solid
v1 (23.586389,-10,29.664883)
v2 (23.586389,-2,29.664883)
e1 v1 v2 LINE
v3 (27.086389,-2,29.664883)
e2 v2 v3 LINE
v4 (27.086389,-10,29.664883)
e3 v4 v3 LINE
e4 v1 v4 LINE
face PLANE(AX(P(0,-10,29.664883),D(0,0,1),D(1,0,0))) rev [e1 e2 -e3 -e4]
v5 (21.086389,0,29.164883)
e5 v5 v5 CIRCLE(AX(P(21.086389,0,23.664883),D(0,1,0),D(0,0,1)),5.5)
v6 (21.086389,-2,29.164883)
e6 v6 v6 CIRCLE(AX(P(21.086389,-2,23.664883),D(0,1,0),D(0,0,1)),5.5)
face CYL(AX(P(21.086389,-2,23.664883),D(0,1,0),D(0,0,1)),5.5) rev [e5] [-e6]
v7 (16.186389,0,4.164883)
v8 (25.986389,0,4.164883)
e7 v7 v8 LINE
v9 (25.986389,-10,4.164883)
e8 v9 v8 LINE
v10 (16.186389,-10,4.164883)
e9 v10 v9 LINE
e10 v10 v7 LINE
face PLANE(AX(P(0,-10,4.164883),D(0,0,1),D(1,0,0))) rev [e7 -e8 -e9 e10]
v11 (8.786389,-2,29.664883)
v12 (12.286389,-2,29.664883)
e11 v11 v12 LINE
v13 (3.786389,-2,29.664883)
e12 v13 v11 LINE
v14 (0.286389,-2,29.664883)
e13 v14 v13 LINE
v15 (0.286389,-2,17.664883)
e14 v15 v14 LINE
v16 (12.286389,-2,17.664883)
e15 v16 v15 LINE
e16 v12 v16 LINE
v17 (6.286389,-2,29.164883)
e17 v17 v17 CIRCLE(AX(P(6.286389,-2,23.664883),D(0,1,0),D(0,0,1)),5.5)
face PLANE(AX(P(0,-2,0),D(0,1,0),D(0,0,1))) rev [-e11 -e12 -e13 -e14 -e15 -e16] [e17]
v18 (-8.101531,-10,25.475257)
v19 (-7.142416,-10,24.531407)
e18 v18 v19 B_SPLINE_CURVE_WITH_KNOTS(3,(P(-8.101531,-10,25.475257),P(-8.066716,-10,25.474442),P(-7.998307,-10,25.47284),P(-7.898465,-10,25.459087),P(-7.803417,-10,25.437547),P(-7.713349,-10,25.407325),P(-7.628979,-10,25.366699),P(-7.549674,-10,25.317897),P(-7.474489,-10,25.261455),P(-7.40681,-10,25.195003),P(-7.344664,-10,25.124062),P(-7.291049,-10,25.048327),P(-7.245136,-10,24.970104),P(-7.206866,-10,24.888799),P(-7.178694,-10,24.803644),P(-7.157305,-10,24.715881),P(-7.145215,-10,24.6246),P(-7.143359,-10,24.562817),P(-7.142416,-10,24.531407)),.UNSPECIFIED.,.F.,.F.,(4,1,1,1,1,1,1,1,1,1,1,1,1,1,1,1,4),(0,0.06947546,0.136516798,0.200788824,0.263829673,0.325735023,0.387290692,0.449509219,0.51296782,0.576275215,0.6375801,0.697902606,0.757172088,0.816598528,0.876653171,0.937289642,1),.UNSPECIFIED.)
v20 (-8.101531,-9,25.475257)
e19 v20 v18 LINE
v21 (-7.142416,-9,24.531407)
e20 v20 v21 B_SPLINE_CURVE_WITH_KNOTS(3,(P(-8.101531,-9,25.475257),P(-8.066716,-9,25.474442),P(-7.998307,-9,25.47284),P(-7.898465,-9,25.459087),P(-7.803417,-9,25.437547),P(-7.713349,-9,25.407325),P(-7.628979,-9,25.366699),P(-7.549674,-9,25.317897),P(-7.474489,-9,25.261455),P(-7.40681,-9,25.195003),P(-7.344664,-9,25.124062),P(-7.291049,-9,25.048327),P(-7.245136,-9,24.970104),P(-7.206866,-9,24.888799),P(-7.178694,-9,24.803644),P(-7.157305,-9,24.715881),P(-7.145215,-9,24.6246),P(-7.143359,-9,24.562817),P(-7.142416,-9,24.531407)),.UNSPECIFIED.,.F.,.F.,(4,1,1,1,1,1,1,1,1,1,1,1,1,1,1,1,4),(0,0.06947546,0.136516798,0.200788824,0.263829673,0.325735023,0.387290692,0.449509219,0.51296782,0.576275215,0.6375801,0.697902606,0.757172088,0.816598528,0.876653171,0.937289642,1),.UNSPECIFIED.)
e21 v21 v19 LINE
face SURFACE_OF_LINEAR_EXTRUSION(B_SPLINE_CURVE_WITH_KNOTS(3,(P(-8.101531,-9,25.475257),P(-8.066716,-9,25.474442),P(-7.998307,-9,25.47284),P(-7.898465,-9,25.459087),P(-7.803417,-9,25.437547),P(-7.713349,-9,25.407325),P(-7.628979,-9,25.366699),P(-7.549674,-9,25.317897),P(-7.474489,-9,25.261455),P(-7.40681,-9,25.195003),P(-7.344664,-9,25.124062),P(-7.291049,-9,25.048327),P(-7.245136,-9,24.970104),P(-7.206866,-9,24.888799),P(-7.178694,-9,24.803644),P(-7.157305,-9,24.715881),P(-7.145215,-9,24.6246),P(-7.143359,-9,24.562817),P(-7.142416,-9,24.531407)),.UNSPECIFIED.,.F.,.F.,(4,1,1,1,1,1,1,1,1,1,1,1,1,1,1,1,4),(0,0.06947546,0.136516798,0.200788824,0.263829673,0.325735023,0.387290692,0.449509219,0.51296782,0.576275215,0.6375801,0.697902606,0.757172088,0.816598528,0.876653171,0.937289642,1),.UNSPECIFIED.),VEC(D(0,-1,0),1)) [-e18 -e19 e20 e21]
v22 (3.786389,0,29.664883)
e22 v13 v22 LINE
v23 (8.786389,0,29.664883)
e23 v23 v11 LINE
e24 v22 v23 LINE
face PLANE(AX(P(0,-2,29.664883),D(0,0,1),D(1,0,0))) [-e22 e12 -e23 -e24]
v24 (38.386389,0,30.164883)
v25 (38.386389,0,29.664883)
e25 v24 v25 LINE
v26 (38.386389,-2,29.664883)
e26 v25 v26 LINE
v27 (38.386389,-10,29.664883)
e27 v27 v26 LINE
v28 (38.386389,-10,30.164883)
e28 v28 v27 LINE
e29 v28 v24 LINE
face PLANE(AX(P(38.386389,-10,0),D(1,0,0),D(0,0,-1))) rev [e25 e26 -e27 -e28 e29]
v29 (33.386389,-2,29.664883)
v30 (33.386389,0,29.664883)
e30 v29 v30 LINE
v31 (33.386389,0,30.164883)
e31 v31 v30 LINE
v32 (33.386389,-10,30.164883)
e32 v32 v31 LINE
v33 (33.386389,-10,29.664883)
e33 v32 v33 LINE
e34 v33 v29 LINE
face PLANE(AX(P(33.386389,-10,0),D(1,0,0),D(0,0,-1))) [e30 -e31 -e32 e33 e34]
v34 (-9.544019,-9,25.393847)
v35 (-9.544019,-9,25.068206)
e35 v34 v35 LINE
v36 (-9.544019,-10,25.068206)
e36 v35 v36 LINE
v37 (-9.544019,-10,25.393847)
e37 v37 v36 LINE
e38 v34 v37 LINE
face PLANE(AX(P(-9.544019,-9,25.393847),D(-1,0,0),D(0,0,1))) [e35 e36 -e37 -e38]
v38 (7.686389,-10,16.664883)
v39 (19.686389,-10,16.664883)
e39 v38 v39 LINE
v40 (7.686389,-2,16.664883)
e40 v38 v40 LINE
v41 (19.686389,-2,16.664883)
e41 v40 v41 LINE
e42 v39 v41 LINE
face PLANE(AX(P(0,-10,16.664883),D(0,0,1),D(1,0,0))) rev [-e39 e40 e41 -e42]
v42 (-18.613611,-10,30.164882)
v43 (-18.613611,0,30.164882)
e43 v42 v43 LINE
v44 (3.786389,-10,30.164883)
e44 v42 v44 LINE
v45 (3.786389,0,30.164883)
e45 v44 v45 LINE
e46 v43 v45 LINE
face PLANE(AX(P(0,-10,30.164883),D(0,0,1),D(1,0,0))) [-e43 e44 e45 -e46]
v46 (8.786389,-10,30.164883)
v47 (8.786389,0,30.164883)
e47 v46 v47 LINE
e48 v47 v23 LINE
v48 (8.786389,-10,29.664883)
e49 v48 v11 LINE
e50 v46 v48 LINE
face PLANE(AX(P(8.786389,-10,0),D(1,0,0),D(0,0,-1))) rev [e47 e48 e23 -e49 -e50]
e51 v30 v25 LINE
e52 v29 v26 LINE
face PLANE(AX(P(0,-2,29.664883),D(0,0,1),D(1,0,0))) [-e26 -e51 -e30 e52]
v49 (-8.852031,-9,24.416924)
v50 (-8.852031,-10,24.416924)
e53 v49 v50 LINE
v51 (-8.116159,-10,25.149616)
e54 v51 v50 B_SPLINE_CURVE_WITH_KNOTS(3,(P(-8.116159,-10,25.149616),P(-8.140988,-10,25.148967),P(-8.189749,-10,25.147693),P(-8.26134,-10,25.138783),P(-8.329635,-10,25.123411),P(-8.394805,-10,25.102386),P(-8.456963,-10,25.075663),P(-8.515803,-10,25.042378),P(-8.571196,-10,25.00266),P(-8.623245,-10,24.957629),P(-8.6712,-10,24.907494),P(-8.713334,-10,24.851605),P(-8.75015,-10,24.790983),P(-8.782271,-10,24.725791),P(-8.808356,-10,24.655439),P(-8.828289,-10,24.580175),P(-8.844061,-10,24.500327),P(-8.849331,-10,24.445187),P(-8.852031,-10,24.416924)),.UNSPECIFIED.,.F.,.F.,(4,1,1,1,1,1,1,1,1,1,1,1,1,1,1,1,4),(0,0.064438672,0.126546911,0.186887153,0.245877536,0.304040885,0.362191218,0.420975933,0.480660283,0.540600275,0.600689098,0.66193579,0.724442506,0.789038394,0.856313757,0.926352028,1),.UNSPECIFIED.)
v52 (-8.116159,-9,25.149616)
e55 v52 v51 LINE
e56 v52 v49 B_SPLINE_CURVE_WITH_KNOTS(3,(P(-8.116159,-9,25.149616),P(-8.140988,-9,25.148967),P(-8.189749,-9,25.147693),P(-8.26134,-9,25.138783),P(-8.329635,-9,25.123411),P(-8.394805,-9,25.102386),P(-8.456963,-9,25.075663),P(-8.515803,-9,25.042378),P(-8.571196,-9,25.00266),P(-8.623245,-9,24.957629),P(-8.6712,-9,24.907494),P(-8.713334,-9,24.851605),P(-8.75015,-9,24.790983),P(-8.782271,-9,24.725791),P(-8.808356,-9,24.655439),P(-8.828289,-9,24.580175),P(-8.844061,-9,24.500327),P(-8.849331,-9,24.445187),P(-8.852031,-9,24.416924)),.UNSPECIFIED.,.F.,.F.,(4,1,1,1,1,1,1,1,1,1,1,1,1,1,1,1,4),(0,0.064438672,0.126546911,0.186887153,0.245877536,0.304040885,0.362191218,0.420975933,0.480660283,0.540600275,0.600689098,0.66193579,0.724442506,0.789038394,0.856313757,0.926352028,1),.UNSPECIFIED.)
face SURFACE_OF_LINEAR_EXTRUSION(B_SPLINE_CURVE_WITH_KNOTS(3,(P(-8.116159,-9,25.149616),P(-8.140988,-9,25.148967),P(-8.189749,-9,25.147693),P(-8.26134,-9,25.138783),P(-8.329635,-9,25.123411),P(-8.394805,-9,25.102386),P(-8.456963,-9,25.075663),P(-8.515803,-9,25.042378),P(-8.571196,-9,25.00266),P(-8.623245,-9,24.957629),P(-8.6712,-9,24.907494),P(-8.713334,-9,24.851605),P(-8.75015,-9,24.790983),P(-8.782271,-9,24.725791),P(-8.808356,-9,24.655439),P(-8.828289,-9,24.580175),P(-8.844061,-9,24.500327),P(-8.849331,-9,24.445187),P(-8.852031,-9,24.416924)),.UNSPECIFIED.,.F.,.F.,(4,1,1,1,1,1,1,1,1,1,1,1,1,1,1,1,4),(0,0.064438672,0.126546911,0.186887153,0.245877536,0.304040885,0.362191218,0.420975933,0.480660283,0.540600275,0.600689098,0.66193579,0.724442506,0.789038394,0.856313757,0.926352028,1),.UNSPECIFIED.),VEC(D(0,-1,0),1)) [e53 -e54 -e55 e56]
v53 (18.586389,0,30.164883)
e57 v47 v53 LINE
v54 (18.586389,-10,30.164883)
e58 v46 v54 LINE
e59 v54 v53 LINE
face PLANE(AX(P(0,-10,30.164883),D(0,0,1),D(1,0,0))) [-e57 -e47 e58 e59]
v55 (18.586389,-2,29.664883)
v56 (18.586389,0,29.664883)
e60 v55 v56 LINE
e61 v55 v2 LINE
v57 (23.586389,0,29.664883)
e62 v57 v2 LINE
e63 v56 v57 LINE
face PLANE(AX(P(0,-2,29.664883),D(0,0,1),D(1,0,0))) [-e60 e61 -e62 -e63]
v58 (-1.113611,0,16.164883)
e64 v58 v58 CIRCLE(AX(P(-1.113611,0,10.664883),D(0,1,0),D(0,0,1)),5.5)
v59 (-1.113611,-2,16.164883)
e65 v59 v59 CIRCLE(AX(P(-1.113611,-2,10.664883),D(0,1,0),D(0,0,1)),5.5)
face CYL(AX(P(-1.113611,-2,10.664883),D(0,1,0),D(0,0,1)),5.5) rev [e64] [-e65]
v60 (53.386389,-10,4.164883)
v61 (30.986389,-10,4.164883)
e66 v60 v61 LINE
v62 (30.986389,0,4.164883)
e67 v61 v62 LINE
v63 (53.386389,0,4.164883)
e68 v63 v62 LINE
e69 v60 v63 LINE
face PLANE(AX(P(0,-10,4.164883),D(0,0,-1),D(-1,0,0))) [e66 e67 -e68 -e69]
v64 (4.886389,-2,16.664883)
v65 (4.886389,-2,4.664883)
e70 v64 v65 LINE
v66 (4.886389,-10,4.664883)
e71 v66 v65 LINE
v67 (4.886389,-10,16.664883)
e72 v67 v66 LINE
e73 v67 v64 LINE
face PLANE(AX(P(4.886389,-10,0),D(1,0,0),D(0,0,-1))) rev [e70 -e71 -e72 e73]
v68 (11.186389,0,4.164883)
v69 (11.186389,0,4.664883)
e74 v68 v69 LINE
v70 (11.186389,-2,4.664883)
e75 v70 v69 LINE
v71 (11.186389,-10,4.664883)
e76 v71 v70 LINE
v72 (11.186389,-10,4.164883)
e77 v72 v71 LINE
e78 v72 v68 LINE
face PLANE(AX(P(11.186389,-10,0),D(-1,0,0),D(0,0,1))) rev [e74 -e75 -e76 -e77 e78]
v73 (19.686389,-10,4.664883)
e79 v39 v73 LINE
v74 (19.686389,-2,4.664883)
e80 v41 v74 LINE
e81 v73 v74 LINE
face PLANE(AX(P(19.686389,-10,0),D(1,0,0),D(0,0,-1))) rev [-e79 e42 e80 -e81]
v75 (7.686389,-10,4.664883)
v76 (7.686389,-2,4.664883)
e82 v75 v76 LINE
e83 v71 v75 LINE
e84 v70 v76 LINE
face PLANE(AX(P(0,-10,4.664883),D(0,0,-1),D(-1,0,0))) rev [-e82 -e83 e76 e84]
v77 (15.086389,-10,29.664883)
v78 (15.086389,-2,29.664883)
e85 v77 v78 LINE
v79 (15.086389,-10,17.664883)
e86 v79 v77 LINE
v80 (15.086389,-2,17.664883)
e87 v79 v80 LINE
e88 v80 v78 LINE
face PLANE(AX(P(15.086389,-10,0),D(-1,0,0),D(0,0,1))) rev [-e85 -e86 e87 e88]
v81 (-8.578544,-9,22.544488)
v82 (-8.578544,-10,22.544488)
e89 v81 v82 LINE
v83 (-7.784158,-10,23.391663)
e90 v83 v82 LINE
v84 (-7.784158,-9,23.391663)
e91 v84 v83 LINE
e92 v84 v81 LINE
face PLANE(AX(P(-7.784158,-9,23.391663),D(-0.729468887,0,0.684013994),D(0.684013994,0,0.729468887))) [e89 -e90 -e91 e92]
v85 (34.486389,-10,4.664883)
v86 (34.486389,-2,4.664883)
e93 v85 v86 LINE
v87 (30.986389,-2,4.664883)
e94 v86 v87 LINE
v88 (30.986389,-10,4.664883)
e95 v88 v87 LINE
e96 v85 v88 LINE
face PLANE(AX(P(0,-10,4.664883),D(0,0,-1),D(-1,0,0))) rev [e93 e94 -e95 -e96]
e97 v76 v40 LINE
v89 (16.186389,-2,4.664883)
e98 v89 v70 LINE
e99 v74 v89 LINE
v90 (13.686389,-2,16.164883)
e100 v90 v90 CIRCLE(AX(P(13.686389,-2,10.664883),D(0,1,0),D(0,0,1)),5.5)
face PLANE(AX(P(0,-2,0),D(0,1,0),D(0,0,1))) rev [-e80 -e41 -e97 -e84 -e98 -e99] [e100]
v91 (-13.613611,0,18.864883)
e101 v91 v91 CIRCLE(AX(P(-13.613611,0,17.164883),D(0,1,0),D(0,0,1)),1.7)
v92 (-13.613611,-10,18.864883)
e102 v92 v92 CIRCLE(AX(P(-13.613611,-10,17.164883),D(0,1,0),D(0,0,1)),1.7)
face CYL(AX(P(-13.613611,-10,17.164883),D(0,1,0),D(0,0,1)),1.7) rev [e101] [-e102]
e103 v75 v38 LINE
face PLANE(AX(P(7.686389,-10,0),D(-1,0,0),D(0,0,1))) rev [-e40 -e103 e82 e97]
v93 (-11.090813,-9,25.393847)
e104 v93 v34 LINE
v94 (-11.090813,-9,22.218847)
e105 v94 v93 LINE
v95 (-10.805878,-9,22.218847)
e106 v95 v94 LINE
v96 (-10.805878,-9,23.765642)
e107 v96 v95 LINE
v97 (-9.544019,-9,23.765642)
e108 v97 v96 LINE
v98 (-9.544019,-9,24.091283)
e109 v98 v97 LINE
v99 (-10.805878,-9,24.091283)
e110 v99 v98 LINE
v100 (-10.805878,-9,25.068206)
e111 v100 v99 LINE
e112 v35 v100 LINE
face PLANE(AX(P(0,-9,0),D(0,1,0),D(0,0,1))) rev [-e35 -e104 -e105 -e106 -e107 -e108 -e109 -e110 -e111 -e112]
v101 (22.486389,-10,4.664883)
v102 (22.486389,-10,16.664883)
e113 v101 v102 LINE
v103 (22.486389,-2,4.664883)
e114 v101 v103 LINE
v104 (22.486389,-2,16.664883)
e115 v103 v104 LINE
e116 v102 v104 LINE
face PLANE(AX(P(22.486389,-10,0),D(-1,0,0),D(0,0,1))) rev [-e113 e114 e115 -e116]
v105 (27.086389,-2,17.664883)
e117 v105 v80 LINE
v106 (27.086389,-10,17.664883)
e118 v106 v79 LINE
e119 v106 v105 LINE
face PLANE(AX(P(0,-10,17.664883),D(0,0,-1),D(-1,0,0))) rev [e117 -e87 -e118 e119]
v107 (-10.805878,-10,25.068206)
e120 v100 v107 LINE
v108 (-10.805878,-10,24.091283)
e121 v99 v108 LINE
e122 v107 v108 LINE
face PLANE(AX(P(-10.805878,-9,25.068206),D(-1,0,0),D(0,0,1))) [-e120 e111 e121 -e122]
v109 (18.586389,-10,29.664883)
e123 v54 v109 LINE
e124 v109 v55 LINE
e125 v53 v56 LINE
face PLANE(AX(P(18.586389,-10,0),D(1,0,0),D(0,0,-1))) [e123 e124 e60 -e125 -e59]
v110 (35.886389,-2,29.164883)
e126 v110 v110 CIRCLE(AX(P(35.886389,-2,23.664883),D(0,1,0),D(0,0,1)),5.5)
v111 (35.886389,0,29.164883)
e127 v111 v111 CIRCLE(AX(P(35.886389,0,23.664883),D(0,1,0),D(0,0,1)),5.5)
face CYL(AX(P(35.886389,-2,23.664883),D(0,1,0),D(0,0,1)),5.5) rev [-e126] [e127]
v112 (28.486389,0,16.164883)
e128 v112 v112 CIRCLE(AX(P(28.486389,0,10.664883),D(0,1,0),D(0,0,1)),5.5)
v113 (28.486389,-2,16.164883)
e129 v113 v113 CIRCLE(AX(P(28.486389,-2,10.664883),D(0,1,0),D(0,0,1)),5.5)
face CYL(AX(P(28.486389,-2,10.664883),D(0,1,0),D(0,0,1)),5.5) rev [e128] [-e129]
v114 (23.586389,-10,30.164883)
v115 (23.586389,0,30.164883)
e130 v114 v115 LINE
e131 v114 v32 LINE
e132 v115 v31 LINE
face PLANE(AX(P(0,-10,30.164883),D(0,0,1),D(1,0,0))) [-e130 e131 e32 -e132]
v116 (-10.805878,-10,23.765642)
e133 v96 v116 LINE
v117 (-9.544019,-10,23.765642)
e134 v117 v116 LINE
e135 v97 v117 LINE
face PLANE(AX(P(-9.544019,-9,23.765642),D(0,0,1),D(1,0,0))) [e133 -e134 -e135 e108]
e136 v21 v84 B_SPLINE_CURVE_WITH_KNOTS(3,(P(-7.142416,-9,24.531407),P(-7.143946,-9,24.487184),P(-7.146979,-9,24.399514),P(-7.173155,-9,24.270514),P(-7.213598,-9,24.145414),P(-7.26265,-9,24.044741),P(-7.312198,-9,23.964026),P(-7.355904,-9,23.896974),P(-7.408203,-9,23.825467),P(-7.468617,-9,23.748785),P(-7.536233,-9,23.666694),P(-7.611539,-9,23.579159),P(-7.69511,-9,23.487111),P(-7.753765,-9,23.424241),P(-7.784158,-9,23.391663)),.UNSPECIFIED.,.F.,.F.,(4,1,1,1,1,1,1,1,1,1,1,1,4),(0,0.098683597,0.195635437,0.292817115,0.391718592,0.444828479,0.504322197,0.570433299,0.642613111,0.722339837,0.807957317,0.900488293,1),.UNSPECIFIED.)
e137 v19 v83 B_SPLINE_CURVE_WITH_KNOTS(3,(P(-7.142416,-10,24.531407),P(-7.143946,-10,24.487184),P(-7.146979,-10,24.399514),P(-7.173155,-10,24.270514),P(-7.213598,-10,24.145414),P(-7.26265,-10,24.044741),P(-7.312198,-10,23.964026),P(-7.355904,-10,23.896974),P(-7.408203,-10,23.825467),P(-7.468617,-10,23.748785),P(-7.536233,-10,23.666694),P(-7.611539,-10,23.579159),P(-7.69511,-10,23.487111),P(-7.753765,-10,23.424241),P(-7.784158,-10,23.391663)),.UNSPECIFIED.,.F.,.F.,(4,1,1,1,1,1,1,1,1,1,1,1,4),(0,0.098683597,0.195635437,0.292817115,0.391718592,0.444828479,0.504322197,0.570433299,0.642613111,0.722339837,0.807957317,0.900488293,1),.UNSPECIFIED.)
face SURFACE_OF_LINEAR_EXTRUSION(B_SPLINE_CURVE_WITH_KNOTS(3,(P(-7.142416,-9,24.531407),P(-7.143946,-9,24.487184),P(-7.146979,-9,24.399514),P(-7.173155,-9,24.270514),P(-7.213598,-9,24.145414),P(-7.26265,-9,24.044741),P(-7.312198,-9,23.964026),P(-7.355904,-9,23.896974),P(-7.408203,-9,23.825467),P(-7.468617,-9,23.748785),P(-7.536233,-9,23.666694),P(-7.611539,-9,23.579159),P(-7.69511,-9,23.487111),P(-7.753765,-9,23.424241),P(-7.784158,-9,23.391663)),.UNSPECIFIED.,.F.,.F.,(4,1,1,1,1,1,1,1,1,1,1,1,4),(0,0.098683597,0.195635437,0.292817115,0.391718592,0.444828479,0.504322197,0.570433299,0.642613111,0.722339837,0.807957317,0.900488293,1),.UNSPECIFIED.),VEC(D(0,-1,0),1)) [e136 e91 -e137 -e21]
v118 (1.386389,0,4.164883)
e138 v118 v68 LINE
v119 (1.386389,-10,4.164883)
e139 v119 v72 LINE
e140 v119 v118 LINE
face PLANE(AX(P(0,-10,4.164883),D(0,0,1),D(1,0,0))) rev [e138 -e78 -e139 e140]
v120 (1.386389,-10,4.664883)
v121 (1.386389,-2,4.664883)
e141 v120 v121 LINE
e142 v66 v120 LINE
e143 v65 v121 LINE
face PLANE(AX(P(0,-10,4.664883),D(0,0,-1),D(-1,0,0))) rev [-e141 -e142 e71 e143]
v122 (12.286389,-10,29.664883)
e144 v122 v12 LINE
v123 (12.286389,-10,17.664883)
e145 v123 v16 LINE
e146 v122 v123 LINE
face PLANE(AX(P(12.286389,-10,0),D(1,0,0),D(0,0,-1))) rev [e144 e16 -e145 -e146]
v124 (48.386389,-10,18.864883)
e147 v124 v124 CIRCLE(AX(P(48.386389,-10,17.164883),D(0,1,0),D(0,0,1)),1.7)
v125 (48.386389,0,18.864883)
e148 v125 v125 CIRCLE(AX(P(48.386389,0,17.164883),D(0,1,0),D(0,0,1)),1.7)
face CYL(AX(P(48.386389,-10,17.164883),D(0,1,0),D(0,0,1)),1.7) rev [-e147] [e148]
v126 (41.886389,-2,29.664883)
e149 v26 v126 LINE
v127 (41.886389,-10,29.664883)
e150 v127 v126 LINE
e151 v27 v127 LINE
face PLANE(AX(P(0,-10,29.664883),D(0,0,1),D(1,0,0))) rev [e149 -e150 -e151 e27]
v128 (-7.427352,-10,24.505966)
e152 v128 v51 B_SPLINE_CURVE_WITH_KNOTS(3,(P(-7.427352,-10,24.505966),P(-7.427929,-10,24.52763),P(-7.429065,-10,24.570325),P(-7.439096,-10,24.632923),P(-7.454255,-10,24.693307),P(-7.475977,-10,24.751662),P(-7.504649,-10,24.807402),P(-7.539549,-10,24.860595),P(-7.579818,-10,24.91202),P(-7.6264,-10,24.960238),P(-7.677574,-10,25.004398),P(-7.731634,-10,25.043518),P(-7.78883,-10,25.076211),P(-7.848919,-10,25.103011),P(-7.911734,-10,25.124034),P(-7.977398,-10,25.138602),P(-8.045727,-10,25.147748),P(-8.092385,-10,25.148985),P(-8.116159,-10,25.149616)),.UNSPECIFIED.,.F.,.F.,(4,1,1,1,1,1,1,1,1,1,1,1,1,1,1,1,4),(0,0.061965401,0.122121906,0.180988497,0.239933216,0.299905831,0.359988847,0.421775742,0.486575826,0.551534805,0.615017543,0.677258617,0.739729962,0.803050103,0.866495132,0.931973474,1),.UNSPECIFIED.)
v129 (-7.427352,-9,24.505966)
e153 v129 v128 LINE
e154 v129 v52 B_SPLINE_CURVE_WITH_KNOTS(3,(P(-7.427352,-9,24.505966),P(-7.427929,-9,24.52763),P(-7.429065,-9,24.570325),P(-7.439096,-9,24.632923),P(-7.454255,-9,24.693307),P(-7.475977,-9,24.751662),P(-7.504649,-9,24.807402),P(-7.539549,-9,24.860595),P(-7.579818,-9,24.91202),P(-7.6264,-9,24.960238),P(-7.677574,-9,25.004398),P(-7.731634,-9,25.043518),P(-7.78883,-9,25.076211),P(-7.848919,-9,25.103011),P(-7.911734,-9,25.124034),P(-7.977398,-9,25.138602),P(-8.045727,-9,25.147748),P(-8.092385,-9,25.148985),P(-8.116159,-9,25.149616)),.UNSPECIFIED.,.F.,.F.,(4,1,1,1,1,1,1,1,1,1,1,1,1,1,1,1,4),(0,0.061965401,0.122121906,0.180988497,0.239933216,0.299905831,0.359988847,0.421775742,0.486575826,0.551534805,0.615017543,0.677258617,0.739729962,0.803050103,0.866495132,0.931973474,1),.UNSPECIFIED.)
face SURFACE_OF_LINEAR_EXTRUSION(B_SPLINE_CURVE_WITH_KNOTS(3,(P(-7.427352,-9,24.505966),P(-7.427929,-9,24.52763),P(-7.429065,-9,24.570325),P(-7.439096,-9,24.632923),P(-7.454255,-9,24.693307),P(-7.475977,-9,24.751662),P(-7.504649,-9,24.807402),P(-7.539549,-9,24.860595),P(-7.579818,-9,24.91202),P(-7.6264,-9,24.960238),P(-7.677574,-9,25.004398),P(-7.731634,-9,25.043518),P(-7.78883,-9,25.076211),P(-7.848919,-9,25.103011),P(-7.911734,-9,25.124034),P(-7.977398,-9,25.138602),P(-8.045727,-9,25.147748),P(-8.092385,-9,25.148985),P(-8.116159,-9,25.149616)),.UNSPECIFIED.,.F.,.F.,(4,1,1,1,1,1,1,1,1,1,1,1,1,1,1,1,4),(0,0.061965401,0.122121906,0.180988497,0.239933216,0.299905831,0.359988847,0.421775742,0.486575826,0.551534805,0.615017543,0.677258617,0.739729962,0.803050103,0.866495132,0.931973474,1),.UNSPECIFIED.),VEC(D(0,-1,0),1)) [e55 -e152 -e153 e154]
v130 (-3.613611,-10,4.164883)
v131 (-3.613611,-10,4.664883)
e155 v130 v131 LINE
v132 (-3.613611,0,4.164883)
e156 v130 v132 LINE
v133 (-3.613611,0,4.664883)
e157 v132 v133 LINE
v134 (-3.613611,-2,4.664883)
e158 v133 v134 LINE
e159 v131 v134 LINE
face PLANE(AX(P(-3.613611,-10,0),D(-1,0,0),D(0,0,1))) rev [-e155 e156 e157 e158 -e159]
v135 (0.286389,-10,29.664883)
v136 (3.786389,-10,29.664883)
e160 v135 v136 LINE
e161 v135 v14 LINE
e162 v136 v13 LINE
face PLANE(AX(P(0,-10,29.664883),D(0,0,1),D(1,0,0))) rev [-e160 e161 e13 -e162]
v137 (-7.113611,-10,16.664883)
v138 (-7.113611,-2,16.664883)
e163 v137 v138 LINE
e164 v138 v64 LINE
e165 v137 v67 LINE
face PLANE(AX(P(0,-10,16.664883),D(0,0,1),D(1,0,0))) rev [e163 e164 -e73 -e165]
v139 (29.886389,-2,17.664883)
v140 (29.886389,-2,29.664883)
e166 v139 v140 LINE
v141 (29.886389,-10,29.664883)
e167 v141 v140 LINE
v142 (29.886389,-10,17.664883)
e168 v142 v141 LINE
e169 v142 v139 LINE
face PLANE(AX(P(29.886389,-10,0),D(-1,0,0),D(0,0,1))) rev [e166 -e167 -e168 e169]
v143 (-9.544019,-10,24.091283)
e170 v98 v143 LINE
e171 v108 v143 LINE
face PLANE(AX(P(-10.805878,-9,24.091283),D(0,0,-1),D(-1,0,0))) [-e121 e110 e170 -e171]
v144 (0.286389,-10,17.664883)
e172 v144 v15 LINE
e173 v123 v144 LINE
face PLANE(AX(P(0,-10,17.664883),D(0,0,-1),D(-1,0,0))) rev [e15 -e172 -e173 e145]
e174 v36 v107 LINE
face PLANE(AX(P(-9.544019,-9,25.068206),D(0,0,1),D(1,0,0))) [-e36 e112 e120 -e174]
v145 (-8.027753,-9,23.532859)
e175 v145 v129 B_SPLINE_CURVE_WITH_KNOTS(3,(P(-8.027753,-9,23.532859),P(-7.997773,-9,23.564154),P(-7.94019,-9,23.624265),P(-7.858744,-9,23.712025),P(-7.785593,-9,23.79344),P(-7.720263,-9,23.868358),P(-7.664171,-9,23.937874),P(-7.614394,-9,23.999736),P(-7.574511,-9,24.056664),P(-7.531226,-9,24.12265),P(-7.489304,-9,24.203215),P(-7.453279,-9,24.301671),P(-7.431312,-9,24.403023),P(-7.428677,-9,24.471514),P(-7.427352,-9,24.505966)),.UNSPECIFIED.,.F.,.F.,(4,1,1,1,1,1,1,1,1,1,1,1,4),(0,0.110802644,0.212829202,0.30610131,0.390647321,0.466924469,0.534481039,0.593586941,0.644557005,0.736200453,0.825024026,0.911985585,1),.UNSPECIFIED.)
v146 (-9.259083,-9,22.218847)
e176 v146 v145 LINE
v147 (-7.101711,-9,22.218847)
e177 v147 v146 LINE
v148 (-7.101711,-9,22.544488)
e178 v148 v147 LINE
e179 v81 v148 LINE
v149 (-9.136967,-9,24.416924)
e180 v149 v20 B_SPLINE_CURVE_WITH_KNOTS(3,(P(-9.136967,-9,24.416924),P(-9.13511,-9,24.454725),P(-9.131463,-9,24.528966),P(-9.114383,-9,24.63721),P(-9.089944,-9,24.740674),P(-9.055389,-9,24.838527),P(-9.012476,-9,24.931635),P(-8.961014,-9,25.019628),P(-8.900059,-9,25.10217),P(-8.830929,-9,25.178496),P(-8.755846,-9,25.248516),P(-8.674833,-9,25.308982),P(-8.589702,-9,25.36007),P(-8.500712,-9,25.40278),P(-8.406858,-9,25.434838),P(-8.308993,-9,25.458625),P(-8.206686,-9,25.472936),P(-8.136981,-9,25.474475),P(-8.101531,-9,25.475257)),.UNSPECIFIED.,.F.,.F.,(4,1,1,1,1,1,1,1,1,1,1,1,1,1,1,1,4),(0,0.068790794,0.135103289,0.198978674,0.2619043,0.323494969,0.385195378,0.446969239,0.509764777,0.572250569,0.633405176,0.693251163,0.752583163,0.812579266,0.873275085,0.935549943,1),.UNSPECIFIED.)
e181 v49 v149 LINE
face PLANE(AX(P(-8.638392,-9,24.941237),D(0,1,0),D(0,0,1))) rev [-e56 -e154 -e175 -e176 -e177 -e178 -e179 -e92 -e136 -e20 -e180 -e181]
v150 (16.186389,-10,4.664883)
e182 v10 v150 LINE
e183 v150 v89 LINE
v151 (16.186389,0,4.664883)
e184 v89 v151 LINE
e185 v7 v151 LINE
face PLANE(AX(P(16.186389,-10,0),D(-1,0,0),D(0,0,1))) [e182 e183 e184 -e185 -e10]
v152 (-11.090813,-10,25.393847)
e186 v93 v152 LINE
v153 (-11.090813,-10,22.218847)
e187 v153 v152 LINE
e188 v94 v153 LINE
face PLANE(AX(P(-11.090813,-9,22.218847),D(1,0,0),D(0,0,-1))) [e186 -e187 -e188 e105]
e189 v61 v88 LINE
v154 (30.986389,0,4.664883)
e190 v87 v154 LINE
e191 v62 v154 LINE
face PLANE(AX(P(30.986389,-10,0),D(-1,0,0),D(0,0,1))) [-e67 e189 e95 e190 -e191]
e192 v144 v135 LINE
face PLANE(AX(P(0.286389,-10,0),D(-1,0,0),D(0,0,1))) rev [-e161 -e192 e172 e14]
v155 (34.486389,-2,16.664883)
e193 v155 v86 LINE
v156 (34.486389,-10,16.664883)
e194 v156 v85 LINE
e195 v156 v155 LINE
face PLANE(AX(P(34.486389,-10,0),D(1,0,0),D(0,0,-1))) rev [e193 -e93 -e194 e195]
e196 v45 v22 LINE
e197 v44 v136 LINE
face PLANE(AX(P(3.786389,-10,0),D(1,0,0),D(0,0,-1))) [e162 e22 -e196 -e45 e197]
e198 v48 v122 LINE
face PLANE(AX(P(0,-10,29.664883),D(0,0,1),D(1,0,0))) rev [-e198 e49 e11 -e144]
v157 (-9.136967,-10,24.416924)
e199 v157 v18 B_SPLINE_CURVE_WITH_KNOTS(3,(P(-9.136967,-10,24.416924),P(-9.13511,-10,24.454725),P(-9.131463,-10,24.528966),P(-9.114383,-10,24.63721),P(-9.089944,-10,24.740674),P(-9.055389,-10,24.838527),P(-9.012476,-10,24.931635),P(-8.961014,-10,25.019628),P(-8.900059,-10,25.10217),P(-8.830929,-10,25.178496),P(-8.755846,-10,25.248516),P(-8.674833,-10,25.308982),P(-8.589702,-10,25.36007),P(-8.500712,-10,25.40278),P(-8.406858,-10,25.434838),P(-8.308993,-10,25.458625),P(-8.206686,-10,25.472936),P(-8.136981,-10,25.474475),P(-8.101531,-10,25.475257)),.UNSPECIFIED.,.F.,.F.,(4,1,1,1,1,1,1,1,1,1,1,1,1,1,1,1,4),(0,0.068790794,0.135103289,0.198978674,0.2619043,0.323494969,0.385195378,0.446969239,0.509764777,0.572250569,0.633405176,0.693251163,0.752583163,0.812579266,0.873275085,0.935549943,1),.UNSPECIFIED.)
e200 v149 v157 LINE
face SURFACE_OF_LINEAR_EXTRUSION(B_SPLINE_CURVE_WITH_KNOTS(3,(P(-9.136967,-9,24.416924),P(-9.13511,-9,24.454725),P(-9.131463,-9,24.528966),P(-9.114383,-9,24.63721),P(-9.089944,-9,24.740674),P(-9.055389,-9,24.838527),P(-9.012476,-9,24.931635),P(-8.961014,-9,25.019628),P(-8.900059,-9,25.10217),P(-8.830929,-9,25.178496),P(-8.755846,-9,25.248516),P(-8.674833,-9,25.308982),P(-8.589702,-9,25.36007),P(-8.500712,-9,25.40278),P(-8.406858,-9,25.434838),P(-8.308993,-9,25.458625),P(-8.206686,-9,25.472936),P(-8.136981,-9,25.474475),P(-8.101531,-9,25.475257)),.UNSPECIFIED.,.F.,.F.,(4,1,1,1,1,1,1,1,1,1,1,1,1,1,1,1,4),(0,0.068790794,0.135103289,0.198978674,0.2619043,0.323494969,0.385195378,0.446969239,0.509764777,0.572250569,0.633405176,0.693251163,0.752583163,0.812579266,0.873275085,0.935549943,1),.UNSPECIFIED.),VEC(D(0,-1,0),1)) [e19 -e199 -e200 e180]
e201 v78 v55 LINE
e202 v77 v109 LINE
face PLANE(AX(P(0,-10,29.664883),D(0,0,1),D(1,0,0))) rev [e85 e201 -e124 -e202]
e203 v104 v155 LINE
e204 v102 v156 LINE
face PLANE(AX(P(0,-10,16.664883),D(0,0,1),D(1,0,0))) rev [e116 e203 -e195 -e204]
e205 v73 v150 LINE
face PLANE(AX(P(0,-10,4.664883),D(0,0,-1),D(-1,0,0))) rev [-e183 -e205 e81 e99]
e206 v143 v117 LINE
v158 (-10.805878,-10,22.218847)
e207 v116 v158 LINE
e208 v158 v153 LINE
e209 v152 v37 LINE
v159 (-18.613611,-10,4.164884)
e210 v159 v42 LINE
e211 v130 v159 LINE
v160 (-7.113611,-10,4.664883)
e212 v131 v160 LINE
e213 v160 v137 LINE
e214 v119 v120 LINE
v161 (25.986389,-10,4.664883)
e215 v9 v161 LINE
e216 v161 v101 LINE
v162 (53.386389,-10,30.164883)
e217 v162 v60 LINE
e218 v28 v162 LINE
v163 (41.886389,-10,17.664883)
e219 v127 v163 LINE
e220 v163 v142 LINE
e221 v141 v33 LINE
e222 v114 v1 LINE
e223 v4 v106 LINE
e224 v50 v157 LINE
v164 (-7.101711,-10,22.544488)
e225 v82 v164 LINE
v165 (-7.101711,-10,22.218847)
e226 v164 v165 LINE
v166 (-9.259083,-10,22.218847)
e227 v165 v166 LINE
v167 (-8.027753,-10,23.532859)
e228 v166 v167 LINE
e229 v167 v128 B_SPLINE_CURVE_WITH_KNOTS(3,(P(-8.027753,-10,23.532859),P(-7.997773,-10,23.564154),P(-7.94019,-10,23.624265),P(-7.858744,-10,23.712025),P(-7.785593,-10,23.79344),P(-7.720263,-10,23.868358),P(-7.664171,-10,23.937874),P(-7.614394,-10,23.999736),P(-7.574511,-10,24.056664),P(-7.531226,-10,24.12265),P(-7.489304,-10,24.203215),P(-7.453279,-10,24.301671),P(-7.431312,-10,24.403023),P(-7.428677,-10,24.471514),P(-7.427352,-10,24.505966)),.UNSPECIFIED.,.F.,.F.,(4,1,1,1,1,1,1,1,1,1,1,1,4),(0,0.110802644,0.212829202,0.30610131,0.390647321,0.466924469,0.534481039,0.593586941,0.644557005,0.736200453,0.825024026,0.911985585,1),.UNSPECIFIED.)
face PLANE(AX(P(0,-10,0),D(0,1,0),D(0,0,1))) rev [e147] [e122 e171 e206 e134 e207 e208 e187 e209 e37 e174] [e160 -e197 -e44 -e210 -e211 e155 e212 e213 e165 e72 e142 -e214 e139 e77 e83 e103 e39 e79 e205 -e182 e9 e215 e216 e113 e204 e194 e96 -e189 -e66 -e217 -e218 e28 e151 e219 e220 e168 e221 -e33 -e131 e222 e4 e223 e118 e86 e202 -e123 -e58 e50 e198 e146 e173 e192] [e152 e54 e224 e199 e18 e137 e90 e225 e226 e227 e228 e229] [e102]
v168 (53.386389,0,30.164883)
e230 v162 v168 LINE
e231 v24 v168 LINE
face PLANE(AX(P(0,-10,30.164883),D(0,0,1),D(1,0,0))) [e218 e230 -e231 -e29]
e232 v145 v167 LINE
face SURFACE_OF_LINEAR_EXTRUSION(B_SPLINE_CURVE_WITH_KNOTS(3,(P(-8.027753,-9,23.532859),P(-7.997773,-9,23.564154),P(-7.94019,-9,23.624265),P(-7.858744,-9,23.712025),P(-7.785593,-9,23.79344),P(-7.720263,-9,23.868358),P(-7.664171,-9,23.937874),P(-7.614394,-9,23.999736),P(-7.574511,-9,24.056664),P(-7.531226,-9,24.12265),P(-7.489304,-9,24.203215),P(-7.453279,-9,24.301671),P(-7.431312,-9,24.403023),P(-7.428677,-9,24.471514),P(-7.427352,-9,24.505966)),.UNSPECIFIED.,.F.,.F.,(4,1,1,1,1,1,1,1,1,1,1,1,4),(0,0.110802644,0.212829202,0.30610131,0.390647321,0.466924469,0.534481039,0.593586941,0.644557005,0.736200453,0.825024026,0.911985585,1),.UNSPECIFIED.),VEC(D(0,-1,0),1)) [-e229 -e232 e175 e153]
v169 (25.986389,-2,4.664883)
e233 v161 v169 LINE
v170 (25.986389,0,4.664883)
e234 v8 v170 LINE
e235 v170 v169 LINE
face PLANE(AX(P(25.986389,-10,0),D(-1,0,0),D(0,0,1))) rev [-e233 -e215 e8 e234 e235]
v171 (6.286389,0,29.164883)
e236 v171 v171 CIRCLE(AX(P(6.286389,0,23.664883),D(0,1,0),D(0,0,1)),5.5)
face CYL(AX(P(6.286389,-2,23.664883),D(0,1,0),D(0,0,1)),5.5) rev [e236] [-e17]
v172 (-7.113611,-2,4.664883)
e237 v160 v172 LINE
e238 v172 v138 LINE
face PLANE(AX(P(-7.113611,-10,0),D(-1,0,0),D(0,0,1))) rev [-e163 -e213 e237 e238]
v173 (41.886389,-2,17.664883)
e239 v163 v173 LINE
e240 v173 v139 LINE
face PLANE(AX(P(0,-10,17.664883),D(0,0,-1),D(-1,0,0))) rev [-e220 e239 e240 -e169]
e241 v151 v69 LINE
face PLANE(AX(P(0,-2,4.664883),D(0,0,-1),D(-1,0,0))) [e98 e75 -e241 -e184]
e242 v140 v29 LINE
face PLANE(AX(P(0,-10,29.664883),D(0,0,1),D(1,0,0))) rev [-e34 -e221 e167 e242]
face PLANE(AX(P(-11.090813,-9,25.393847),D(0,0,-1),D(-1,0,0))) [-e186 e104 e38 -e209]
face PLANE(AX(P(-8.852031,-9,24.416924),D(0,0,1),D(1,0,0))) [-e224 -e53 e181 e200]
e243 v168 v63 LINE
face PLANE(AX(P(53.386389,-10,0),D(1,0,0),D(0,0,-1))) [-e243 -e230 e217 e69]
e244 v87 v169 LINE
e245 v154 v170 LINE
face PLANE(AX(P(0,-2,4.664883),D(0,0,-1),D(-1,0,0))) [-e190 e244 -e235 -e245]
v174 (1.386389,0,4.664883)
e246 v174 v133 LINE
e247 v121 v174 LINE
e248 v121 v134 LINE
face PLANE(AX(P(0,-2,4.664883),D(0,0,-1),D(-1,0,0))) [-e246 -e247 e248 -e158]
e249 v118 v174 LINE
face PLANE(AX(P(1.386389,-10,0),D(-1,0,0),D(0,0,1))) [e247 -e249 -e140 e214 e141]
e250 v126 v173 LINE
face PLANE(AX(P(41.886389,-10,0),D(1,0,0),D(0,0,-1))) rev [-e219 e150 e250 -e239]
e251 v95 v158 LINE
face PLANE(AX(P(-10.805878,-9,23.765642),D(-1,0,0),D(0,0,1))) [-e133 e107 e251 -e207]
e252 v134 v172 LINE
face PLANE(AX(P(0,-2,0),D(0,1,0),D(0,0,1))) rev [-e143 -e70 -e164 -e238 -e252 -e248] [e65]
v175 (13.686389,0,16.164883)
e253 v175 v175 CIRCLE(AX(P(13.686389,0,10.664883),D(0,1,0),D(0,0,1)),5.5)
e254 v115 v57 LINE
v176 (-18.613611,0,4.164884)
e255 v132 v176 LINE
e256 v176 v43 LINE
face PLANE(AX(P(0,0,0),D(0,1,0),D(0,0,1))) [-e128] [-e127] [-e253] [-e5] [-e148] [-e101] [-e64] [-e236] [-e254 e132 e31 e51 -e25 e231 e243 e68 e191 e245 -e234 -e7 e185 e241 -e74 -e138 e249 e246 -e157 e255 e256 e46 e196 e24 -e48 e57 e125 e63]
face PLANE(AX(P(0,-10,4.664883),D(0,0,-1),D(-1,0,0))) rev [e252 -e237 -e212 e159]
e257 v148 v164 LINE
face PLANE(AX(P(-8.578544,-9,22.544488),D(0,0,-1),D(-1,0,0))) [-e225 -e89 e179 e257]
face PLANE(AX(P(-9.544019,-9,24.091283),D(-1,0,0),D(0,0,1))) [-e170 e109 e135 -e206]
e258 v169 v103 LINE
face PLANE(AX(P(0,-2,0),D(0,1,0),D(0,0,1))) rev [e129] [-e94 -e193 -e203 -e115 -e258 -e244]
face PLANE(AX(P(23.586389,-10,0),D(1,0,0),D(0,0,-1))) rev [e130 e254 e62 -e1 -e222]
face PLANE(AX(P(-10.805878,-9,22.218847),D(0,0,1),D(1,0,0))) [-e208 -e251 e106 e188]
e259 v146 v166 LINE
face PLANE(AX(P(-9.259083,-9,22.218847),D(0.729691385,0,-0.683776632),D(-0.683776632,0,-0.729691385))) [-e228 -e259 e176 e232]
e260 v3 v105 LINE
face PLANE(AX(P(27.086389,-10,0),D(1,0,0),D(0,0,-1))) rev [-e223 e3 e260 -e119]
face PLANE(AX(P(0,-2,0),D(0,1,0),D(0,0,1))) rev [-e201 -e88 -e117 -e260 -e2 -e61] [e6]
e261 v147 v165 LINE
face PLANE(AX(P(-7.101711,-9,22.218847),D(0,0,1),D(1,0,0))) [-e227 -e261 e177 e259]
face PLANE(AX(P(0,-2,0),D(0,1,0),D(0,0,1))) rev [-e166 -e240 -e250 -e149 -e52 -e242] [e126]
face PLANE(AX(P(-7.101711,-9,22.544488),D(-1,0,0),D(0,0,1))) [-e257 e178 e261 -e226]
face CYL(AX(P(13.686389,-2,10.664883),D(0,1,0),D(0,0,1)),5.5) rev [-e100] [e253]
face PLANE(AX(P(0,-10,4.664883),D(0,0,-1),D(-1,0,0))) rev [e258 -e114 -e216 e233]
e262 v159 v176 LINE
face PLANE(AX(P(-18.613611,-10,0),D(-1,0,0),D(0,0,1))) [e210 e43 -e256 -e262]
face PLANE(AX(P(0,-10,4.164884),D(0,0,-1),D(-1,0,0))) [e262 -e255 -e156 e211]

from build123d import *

# Parameters (mm, degrees)
SKETCH1_W               = 12
SKETCH1_H               = 12
SKETCH1_R               = 5.5
BOSS_EXTRUDE1_DEPTH     = 2
BOSS_EXTRUDE1_2_DEPTH   = 2
BOSS_EXTRUDE1_3_DEPTH   = 2
BOSS_EXTRUDE1_4_DEPTH   = 2
BOSS_EXTRUDE1_5_DEPTH   = 2
BOSS_EXTRUDE1_6_DEPTH   = 2
BOSS_EXTRUDE2_START     = -10
BOSS_EXTRUDE2_OUTLINE_R = 1.7
BOSS_EXTRUDE2_DEPTH     = 10
CUT_EXTRUDE1_DEPTH      = 1


# Read off the part's stored shape, not the designer's step: Boss-Extrude2
with BuildPart() as part:
    # Sketch1 → Boss-Extrude1 (new body)
    with BuildSketch(Plane(origin=(0, 0, 0), x_dir=(1, 0, 0), z_dir=(0, 1, 0))):
        with Locations((13.686388819, -10.664882883)):
            Rectangle(SKETCH1_W, SKETCH1_H)
        with Locations(Location((13.686388819, -10.664882883, 0), (0, 0, 270))):
            Circle(SKETCH1_R, mode=Mode.SUBTRACT)
    extrude(amount=-BOSS_EXTRUDE1_DEPTH)



with BuildPart() as body_2:
    # Sketch1 → Boss-Extrude1 2 (new body)
    with BuildSketch(Plane(origin=(0, 0, 0), x_dir=(1, 0, 0), z_dir=(0, 1, 0))):
        with Locations((-1.113611181, -10.664882883)):
            Rectangle(SKETCH1_W, SKETCH1_H)
        with Locations(Location((-1.113611181, -10.664882883, 0), (0, 0, 270))):
            Circle(SKETCH1_R, mode=Mode.SUBTRACT)
    extrude(amount=-BOSS_EXTRUDE1_2_DEPTH)


with BuildPart() as body_3:
    # Sketch1 → Boss-Extrude1 3 (new body)
    with BuildSketch(Plane(origin=(0, 0, 0), x_dir=(1, 0, 0), z_dir=(0, 1, 0))):
        with Locations((6.28638882, -23.664882883)):
            Rectangle(SKETCH1_W, SKETCH1_H)
        with Locations(Location((6.28638882, -23.664882883, 0), (0, 0, 270))):
            Circle(SKETCH1_R, mode=Mode.SUBTRACT)
    extrude(amount=-BOSS_EXTRUDE1_3_DEPTH)


with BuildPart() as body_4:
    # Sketch1 → Boss-Extrude1 4 (new body)
    with BuildSketch(Plane(origin=(0, 0, 0), x_dir=(1, 0, 0), z_dir=(0, 1, 0))):
        with Locations((21.08638882, -23.664882883)):
            Rectangle(SKETCH1_W, SKETCH1_H)
        with Locations(Location((21.08638882, -23.664882883, 0), (0, 0, 270))):
            Circle(SKETCH1_R, mode=Mode.SUBTRACT)
    extrude(amount=-BOSS_EXTRUDE1_4_DEPTH)


with BuildPart() as body_5:
    # Sketch1 → Boss-Extrude1 5 (new body)
    with BuildSketch(Plane(origin=(0, 0, 0), x_dir=(1, 0, 0), z_dir=(0, 1, 0))):
        with Locations((35.88638882, -23.664882883)):
            Rectangle(SKETCH1_W, SKETCH1_H)
        with Locations(Location((35.88638882, -23.664882883, 0), (0, 0, 270))):
            Circle(SKETCH1_R, mode=Mode.SUBTRACT)
    extrude(amount=-BOSS_EXTRUDE1_5_DEPTH)


with BuildPart() as body_6:
    # Sketch1 → Boss-Extrude1 6 (new body)
    with BuildSketch(Plane(origin=(0, 0, 0), x_dir=(1, 0, 0), z_dir=(0, 1, 0))):
        with Locations((28.486388819, -10.664882883)):
            Rectangle(SKETCH1_W, SKETCH1_H)
        with Locations(Location((28.486388819, -10.664882883, 0), (0, 0, 270))):
            Circle(SKETCH1_R, mode=Mode.SUBTRACT)
    extrude(amount=-BOSS_EXTRUDE1_6_DEPTH)


with BuildPart() as part_1:
    add(part.part)

    add(body_2.part)  # Boss-Extrude2 merges body 2

    add(body_3.part)  # Boss-Extrude2 merges body 3

    add(body_4.part)  # Boss-Extrude2 merges body 4

    add(body_5.part)  # Boss-Extrude2 merges body 5

    add(body_6.part)  # Boss-Extrude2 merges body 6
    # Boss-Extrude2 outline → Boss-Extrude2 (add)
    with BuildSketch(Plane(origin=(0, 0, 0), x_dir=(1, 0, 0), z_dir=(0, 1, 0)).offset(BOSS_EXTRUDE2_START)):
        Polygon((22.486388819, -4.664882883), (25.986388819, -4.664882883), (25.986388819, -4.164882883), (16.186388819, -4.164882883), (16.186388819, -4.664882883), (19.686388819, -4.664882883), (19.686388819, -16.664882883), (7.686388819, -16.664882883), (7.686388819, -4.664882883), (11.186388819, -4.664882883), (11.186388819, -4.164882883), (1.386388819, -4.164882883), (1.386388819, -4.664882883), (4.886388819, -4.664882883), (4.886388819, -16.664882883), (-7.113611181, -16.664882883), (-7.113611181, -4.664882883), (-3.613611181, -4.664882883), (-3.613611181, -4.164882883), (-18.613611181, -4.164883527), (-18.613611181, -30.164882449), (3.78638882, -30.164882883), (3.78638882, -29.664882883), (0.28638882, -29.664882883), (0.28638882, -17.664882883), (12.28638882, -17.664882883), (12.28638882, -29.664882883), (8.78638882, -29.664882883), (8.78638882, -30.164882883), (18.58638882, -30.164882883), (18.58638882, -29.664882883), (15.08638882, -29.664882883), (15.08638882, -17.664882883), (27.08638882, -17.664882883), (27.08638882, -29.664882883), (23.58638882, -29.664882883), (23.58638882, -30.164882883), (33.38638882, -30.164882883), (33.38638882, -29.664882883), (29.88638882, -29.664882883), (29.88638882, -17.664882883), (41.88638882, -17.664882883), (41.88638882, -29.664882883), (38.38638882, -29.664882883), (38.38638882, -30.164882883), (53.38638882, -30.164882883), (53.38638882, -4.164882883), (30.986388819, -4.164882883), (30.986388819, -4.664882883), (34.486388819, -4.664882883), (34.486388819, -16.664882883), (22.486388819, -16.664882883), align=None)
        with Locations((-13.613611181, -17.164882988)):
            Circle(BOSS_EXTRUDE2_OUTLINE_R, mode=Mode.SUBTRACT)
        with Locations((48.386388819, -17.164882988)):
            Circle(BOSS_EXTRUDE2_OUTLINE_R, mode=Mode.SUBTRACT)
    extrude(amount=BOSS_EXTRUDE2_DEPTH)

    # Sketch2 → Cut-Extrude1 (cut)
    with BuildSketch(Plane.XZ.offset(10)):
        Polygon((-11.090813446, 25.393846705), (-9.544018575, 25.393846705), (-9.544018575, 25.068205679), (-10.805877549, 25.068205679), (-10.805877549, 24.091282602), (-9.544018575, 24.091282602), (-9.544018575, 23.765641577), (-10.805877549, 23.765641577), (-10.805877549, 22.218846705), (-11.090813446, 22.218846705), align=None)
        with BuildLine():
            Line((-8.852031395, 24.416923628), (-9.136967293, 24.416923628))
            add(Edge.make_bspline(
                [(-9.136967293, 24.416923628), (-9.135110232, 24.454725076), (-9.131463015, 24.528966114), (-9.114383067, 24.637209944), (-9.089943843, 24.74067394), (-9.055389453, 24.838527362), (-9.012475901, 24.931635423), (-8.961013662, 25.019628294), (-8.90005924, 25.102170301), (-8.830928846, 25.178496252), (-8.755845866, 25.248516405), (-8.674832621, 25.308982233), (-8.589701775, 25.360070406), (-8.500711605, 25.402779818), (-8.406858094, 25.434838107), (-8.30899293, 25.45862488), (-8.206686142, 25.472936279), (-8.136981265, 25.474474599), (-8.101530594, 25.475256961)],
                knots=[0, 0, 0, 0, 1.10065271, 2.161652631, 3.183658789, 4.190468796, 5.17591951, 6.163126047, 7.15150782, 8.156236427, 9.156009102, 10.134482811, 11.092018607, 12.041330605, 13.001268258, 13.972401359, 14.968799086, 16, 16, 16, 16], degree=3))
            add(Edge.make_bspline(
                [(-8.101530594, 25.475256961), (-8.066716198, 25.474441933), (-7.998307154, 25.472840431), (-7.898465184, 25.459087212), (-7.803417209, 25.437546568), (-7.713349021, 25.407324726), (-7.628979234, 25.366698853), (-7.549674044, 25.3178968), (-7.474489308, 25.261454524), (-7.406810297, 25.195002851), (-7.344663683, 25.124062116), (-7.291049494, 25.048326661), (-7.245136124, 24.97010438), (-7.206865872, 24.888798797), (-7.178693517, 24.803644364), (-7.157304714, 24.71588083), (-7.145214846, 24.624599752), (-7.143359355, 24.562817376), (-7.142416011, 24.531406801)],
                knots=[0, 0, 0, 0, 1.111607364, 2.184268762, 3.212621178, 4.221274766, 5.211760367, 6.196651075, 7.1921475, 8.207485113, 9.220403448, 10.201281604, 11.166441695, 12.114753415, 13.065576456, 14.026450734, 14.996634279, 16, 16, 16, 16], degree=3))
            add(Edge.make_bspline(
                [(-7.142416011, 24.531406801), (-7.143946038, 24.48718376), (-7.146979244, 24.399513729), (-7.173155489, 24.270514062), (-7.21359782, 24.145414473), (-7.262649782, 24.044740618), (-7.31219844, 23.964025865), (-7.355904397, 23.896973819), (-7.408203317, 23.825466998), (-7.468616685, 23.748785207), (-7.536233124, 23.666693885), (-7.611539287, 23.579159348), (-7.695110449, 23.487111285), (-7.753764656, 23.424241012), (-7.784157797, 23.391663211)],
                knots=[0, 0, 0, 0, 1.184203166, 2.347625244, 3.513805382, 4.700623107, 5.337941753, 6.051866363, 6.845199593, 7.711357327, 8.668078039, 9.695487809, 10.805859518, 12, 12, 12, 12], degree=3))
            Line((-7.784157797, 23.391663211), (-8.578543815, 22.544487731))
            Line((-8.578543815, 22.544487731), (-7.101710882, 22.544487731))
            Line((-7.101710882, 22.544487731), (-7.101710882, 22.218846705))
            Line((-7.101710882, 22.218846705), (-9.259082677, 22.218846705))
            Line((-9.259082677, 22.218846705), (-8.027752549, 23.532859125))
            add(Edge.make_bspline(
                [(-8.027752549, 23.532859125), (-7.997773395, 23.564154017), (-7.940189574, 23.624265101), (-7.858743951, 23.712024786), (-7.785592869, 23.793440441), (-7.720262805, 23.868358238), (-7.664170983, 23.937874018), (-7.614394029, 23.999736356), (-7.574510957, 24.056663607), (-7.531226277, 24.122649736), (-7.489303594, 24.203215195), (-7.453278814, 24.301670756), (-7.431312487, 24.403023335), (-7.428677386, 24.471514469), (-7.427351908, 24.505966096)],
                knots=[0, 0, 0, 0, 1.329631726, 2.553950428, 3.673215718, 4.687767853, 5.603093632, 6.413772471, 7.123043292, 7.734684054, 8.834405432, 9.900288307, 10.943827018, 12, 12, 12, 12], degree=3))
            add(Edge.make_bspline(
                [(-7.427351908, 24.505966096), (-7.427928617, 24.527629936), (-7.4290652, 24.570325205), (-7.439096111, 24.632923286), (-7.454254927, 24.693307081), (-7.475976697, 24.751662329), (-7.504648526, 24.807402313), (-7.539549378, 24.860594884), (-7.579817506, 24.912019874), (-7.626400444, 24.960237509), (-7.677573751, 25.004398317), (-7.731634249, 25.043518023), (-7.7888297, 25.076210645), (-7.848918954, 25.103010817), (-7.911734487, 25.124034199), (-7.977397792, 25.138601624), (-8.045727435, 25.147747878), (-8.092384963, 25.148985376), (-8.116158999, 25.149615936)],
                knots=[0, 0, 0, 0, 0.991446411, 1.95395049, 2.89581595, 3.838931463, 4.798493298, 5.75982156, 6.748411868, 7.785213223, 8.824556874, 9.840280684, 10.836137867, 11.835679398, 12.848801643, 13.863922112, 14.911575587, 16, 16, 16, 16], degree=3))
            add(Edge.make_bspline(
                [(-8.116158999, 25.149615936), (-8.140988255, 25.148967299), (-8.189748813, 25.147693485), (-8.26133965, 25.138782925), (-8.329634605, 25.123410627), (-8.394805474, 25.102386072), (-8.456962527, 25.07566296), (-8.515803481, 25.042378306), (-8.571196245, 25.002660423), (-8.623244948, 24.957629347), (-8.671200129, 24.907493737), (-8.713334081, 24.851604699), (-8.75014958, 24.790982687), (-8.782270813, 24.725791273), (-8.808356332, 24.655438916), (-8.828289118, 24.580175355), (-8.844061472, 24.500327387), (-8.84933063, 24.445186632), (-8.852031395, 24.416923628)],
                knots=[0, 0, 0, 0, 1.031018746, 2.02475058, 2.990194455, 3.934040569, 4.864654155, 5.795059489, 6.735614925, 7.690564532, 8.649604399, 9.611025574, 10.590972636, 11.591080095, 12.624614302, 13.701020113, 14.821632451, 16, 16, 16, 16], degree=3))
        make_face()
    extrude(amount=-CUT_EXTRUDE1_DEPTH, mode=Mode.SUBTRACT)


solid = part_1.part
